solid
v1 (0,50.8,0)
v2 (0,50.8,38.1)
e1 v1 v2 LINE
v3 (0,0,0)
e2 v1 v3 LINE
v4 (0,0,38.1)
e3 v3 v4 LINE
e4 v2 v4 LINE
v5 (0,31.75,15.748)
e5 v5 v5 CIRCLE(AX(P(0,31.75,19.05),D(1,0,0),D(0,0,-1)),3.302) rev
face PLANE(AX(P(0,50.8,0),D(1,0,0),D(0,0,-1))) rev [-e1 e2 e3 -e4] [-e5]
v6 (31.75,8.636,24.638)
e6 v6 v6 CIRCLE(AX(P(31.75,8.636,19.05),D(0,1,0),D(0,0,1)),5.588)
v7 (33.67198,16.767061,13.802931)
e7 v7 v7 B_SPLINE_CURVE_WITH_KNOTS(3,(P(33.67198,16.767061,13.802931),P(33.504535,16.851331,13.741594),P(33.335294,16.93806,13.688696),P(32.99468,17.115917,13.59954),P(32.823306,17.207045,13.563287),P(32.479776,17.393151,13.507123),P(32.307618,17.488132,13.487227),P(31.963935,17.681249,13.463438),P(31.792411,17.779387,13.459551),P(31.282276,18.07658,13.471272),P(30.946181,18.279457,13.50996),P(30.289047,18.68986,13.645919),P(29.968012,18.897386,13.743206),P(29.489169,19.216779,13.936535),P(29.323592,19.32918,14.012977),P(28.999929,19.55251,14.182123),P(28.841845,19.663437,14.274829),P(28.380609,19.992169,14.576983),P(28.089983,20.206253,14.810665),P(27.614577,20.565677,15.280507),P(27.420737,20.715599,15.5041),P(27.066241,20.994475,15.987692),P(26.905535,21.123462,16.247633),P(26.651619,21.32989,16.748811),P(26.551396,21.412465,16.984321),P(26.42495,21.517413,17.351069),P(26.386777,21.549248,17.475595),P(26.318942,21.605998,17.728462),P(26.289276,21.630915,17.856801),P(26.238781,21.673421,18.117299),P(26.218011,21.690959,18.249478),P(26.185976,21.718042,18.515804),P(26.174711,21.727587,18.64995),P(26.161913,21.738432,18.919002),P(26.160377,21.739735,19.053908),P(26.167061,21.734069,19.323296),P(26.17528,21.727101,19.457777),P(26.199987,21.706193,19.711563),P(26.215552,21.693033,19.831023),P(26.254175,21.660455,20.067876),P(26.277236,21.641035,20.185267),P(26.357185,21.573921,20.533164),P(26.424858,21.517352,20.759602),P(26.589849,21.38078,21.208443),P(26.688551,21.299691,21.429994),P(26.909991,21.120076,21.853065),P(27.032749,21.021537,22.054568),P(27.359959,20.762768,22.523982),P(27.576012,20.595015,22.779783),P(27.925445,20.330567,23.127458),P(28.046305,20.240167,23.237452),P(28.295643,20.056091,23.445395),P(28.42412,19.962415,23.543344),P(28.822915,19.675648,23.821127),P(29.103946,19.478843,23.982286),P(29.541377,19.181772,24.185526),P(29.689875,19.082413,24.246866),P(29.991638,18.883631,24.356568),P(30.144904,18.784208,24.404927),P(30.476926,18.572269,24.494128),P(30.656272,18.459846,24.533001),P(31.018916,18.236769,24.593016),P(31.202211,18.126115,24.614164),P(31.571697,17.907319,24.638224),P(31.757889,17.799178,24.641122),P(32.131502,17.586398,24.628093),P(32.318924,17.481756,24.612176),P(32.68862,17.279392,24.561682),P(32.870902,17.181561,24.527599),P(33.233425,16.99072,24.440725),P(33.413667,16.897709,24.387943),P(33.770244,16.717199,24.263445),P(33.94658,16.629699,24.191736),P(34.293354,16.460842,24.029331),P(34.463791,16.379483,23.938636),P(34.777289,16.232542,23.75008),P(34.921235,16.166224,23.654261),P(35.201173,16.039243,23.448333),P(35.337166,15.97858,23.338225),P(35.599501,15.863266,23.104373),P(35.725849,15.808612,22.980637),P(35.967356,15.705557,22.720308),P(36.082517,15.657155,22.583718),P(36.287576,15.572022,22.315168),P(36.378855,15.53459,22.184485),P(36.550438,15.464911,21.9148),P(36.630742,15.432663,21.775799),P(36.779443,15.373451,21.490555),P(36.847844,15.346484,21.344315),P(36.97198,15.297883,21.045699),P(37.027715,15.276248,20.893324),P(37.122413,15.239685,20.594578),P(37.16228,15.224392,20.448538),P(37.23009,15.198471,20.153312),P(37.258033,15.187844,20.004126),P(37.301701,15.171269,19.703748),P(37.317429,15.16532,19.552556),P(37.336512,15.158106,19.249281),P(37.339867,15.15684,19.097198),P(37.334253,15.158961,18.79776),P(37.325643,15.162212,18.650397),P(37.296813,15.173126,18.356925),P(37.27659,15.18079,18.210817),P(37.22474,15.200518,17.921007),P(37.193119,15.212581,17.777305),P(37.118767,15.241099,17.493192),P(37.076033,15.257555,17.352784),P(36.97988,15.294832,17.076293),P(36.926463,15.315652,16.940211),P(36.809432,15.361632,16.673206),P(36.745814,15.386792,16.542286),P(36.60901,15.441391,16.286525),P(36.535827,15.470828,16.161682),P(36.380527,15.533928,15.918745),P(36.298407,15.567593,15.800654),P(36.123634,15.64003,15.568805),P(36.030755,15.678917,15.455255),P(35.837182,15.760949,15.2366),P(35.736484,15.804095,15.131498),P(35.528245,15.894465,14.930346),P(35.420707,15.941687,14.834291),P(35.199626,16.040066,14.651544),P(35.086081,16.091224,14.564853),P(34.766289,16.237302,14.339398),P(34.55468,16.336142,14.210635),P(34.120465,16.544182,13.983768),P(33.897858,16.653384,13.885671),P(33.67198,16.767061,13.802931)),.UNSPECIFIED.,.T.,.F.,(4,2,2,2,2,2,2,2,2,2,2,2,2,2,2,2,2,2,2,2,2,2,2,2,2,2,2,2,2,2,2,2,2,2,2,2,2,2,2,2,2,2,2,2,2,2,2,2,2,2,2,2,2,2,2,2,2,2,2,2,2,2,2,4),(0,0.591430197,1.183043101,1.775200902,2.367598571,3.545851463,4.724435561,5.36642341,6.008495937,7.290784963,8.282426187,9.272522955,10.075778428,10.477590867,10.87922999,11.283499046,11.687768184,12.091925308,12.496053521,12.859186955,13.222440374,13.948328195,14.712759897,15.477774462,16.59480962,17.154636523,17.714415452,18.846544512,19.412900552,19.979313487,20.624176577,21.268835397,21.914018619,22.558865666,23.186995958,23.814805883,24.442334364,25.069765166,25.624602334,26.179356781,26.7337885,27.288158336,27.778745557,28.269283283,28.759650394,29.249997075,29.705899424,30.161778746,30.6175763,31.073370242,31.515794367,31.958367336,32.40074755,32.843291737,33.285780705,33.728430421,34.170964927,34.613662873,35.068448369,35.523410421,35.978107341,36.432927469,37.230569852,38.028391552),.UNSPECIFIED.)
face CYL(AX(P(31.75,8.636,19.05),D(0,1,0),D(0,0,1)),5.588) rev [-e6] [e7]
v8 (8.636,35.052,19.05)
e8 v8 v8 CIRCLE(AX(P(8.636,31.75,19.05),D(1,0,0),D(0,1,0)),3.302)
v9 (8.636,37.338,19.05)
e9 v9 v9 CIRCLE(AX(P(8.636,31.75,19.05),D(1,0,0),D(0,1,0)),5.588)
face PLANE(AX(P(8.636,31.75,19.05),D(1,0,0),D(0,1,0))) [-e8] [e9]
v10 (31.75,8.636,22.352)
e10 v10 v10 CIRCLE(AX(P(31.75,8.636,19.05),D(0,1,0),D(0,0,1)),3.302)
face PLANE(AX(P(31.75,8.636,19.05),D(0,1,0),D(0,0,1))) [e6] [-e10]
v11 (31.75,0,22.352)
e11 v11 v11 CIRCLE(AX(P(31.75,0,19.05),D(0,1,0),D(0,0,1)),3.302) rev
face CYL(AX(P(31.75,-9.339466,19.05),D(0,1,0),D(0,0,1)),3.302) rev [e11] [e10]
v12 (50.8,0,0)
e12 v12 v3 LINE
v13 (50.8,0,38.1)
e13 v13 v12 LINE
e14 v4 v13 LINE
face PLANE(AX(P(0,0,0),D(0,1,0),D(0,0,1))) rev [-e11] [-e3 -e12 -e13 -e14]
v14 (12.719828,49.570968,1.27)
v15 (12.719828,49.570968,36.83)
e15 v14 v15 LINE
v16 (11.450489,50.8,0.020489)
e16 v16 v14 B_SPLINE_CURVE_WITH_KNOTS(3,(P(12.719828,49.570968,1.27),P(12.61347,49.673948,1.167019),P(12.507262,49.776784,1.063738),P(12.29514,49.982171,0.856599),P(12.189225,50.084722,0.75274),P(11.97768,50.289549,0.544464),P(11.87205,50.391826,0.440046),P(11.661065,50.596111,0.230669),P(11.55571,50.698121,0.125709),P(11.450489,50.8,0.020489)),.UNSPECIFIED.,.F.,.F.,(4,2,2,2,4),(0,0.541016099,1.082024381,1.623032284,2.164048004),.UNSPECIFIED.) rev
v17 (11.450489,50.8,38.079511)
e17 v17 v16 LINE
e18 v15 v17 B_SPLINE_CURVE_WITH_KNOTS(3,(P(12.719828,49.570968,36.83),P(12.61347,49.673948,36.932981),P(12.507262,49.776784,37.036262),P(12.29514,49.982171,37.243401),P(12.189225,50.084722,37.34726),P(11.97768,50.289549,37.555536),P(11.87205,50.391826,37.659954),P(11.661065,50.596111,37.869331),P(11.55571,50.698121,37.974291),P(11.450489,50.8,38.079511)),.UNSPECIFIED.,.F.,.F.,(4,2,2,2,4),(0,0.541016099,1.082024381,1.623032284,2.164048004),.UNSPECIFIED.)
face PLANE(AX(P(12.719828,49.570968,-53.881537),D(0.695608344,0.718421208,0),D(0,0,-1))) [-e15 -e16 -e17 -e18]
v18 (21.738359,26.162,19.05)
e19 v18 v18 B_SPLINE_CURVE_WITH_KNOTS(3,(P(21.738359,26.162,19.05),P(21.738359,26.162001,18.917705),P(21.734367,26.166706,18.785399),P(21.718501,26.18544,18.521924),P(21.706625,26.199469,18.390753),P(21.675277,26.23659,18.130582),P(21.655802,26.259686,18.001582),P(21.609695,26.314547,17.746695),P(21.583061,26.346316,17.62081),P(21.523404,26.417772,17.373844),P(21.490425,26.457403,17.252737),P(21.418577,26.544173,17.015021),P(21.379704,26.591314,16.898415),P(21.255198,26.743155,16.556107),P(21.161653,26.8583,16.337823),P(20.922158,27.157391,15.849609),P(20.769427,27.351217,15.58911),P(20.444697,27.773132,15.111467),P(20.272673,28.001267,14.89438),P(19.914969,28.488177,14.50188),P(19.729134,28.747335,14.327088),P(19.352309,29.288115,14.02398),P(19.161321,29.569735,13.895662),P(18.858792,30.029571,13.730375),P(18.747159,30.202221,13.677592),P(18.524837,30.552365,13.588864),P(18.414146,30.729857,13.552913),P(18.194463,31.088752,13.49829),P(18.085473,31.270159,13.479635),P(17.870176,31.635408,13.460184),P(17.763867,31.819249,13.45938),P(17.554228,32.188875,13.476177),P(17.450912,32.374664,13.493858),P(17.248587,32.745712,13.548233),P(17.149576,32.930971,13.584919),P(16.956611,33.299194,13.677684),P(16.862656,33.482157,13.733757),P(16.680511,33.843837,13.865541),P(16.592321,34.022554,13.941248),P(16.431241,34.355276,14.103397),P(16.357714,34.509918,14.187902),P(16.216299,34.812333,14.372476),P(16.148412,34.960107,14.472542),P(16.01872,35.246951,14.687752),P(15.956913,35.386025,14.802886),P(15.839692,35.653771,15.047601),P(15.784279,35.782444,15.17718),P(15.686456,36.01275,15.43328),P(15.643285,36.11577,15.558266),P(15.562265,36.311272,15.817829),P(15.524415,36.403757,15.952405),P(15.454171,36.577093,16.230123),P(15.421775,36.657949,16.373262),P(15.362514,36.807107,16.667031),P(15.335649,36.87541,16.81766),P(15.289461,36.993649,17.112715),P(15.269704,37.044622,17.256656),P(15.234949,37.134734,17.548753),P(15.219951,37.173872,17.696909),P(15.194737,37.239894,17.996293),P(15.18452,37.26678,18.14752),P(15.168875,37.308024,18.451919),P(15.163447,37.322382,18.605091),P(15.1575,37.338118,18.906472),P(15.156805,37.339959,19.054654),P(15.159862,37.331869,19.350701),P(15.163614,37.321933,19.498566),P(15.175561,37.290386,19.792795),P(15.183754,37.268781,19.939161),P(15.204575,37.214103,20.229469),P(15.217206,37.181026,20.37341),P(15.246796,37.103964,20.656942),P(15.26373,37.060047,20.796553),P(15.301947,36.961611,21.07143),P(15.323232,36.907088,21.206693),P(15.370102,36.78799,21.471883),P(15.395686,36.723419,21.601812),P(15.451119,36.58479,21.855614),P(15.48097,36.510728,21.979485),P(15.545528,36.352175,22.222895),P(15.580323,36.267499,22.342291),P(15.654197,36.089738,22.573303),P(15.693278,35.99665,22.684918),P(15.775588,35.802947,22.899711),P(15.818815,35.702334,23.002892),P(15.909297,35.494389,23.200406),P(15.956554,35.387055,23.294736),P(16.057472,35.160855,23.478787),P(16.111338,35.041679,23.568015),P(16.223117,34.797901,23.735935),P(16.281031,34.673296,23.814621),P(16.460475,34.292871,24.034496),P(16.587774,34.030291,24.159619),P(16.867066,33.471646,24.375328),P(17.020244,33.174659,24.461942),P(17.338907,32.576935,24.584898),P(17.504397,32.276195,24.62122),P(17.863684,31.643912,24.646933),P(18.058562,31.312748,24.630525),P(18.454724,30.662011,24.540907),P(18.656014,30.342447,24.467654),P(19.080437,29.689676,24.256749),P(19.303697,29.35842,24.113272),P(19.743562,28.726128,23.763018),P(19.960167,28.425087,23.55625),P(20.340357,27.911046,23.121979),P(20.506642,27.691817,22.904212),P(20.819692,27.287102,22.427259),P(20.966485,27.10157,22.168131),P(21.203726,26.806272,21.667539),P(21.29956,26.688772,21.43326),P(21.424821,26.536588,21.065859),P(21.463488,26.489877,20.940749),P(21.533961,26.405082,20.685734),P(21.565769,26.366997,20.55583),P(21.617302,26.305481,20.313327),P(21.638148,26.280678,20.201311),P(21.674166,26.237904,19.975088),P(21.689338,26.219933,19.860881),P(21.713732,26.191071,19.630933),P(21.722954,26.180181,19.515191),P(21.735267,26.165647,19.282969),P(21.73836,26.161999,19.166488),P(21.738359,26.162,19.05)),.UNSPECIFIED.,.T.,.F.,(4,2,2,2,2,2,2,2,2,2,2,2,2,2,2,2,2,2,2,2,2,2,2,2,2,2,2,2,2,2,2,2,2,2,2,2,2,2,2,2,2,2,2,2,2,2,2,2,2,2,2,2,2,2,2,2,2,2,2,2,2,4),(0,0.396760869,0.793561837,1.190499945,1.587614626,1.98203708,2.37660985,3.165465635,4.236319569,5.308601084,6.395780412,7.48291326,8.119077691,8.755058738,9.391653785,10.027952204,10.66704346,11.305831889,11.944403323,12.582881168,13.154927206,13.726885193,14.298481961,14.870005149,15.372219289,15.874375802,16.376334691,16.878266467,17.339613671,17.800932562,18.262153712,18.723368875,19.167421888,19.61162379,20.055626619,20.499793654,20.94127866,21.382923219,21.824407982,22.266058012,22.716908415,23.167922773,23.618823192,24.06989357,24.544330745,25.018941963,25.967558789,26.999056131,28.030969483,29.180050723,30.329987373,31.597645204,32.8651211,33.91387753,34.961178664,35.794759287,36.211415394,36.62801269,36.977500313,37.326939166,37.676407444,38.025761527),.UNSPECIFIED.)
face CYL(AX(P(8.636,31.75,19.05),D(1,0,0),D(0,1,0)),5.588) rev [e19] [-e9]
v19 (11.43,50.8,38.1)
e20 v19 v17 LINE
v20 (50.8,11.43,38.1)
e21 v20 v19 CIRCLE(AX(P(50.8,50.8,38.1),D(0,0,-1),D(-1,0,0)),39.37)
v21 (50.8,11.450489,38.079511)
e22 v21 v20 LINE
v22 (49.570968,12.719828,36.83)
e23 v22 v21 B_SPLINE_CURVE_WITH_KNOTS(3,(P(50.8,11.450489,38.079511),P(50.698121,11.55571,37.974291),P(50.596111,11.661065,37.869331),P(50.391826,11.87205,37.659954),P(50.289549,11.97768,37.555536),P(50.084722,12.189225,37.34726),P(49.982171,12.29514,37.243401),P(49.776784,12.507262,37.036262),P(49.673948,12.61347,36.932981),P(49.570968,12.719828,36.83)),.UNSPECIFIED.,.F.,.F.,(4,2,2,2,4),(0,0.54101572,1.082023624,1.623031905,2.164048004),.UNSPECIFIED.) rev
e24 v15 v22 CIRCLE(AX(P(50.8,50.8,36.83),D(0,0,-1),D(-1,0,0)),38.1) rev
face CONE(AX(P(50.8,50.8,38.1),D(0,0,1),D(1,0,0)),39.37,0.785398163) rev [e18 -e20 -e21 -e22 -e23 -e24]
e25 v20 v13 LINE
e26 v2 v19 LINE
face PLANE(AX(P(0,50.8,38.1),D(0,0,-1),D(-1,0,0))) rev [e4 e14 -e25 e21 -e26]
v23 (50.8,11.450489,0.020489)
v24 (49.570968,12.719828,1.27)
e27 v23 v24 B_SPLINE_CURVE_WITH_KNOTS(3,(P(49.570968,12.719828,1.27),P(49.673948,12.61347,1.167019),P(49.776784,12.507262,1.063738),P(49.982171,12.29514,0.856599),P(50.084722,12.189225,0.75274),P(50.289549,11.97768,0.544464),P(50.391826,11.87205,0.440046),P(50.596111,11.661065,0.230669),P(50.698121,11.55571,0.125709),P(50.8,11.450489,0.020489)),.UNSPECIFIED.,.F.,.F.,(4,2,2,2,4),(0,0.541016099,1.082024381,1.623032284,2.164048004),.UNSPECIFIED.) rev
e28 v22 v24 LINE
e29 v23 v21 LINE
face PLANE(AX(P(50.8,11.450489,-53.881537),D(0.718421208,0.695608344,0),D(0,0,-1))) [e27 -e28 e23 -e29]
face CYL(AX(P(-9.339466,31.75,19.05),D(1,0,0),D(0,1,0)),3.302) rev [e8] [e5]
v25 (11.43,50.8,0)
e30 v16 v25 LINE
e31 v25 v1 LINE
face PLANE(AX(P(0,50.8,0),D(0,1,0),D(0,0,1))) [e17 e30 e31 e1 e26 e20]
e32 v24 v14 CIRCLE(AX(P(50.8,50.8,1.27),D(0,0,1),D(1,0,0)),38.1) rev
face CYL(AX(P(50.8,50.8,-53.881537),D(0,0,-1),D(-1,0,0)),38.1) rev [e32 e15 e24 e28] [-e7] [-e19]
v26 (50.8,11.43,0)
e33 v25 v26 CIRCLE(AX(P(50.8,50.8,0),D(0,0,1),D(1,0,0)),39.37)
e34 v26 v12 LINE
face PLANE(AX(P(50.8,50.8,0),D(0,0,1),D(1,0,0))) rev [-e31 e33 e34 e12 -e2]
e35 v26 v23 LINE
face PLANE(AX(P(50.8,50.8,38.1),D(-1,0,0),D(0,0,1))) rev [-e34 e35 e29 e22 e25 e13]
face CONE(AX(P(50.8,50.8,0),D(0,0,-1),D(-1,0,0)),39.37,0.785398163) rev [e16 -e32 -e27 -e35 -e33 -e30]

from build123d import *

# Parameters (mm, degrees)
SKETCH1_W           = 50.8
SKETCH1_H           = 38.1
BOSS_EXTRUDE1_DEPTH = 50.8
SKETCH2_W           = 38.1
SKETCH2_H           = 38.1
CUT_EXTRUDE1_DEPTH  = 38.1
SKETCH3_R           = 5.588
CUT_EXTRUDE2_DEPTH  = 4.064
SKETCH4_R           = 3.302
CUT_EXTRUDE3_DEPTH  = 8.636
SKETCH5_R           = 5.588
CUT_EXTRUDE4_DEPTH  = 4.064
SKETCH6_R           = 3.302
CUT_EXTRUDE5_DEPTH  = 8.636
FILLET1_R           = 38.1


with BuildPart() as part:
    # Sketch1 → Boss-Extrude1 (new body)
    with BuildSketch(Plane(origin=(0, 0, 0), x_dir=(1, 0, 0), z_dir=(0, 1, 0))):
        with Locations((25.4, -19.05)):
            Rectangle(SKETCH1_W, SKETCH1_H)
    extrude(amount=BOSS_EXTRUDE1_DEPTH)

    # Sketch2 → Cut-Extrude1 (cut)
    with BuildSketch(Plane.XY.offset(38.1)):
        with Locations((31.75, 31.75)):
            Rectangle(SKETCH2_W, SKETCH2_H)
    extrude(amount=-CUT_EXTRUDE1_DEPTH, mode=Mode.SUBTRACT)

    # Sketch3 → Cut-Extrude2 (cut)
    with BuildSketch(Plane(origin=(0, 12.7, 0), x_dir=(1, 0, 0), z_dir=(0, 1, 0))):
        with Locations(Location((31.75, -19.05, 0), (0, 0, 270))):
            Circle(SKETCH3_R)
    extrude(amount=-CUT_EXTRUDE2_DEPTH, mode=Mode.SUBTRACT)

    # Sketch4 → Cut-Extrude3 (cut)
    with BuildSketch(Plane(origin=(0, 8.636, 0), x_dir=(1, 0, 0), z_dir=(0, 1, 0))):
        with Locations(Location((31.75, -19.05, 0), (0, 0, 270))):
            Circle(SKETCH4_R)
    extrude(amount=-CUT_EXTRUDE3_DEPTH, mode=Mode.SUBTRACT)

    # Sketch5 → Cut-Extrude4 (cut)
    with BuildSketch(Plane(origin=(12.7, 0, 0), x_dir=(0, 0, -1), z_dir=(1, 0, 0))):
        with Locations(Location((-19.05, 31.75, 0), (0, 0, 90))):
            Circle(SKETCH5_R)
    extrude(amount=-CUT_EXTRUDE4_DEPTH, mode=Mode.SUBTRACT)

    # Sketch6 → Cut-Extrude5 (cut)
    with BuildSketch(Plane(origin=(8.636, 0, 0), x_dir=(0, 0, -1), z_dir=(1, 0, 0))):
        with Locations(Location((-19.05, 31.75, 0), (0, 0, 90))):
            Circle(SKETCH6_R)
    extrude(amount=-CUT_EXTRUDE5_DEPTH, mode=Mode.SUBTRACT)

    # Fillet1
    # the kernel refuses this fillet: 38.1 mm, written as the material it adds along each edge
    with BuildSketch(Plane(origin=(12.7, 12.7, 38.1), x_dir=(0, 1, 0), z_dir=(0, 0, -1))) as fillet1_piece_1_section:
        with BuildLine():
            CenterArc((FILLET1_R, FILLET1_R), FILLET1_R, 180, 90)
            Line((0, FILLET1_R), (0, 0))
            Line((0, 0), (FILLET1_R, 0))
        make_face()
    fillet1_piece_1 = extrude(amount=38.1, mode=Mode.PRIVATE)
    fillet1_piece_1 = fillet1_piece_1 - Plane(origin=(21.164766811, 31.75, 19.05), x_dir=(0, 1, 0), z_dir=(1, 0, 0)) * Cylinder(5.588, 229, mode=Mode.PRIVATE)
    fillet1_piece_1 = fillet1_piece_1 - Plane(origin=(31.75, 21.164747652, 19.05), x_dir=(0, 0, 1), z_dir=(0, 1, 0)) * Cylinder(5.588, 229, mode=Mode.PRIVATE)
    add(fillet1_piece_1)

    # Chamfer1
    # the kernel refuses this chamfer: 1.27 mm, written as the material it takes off along each edge
    with BuildSketch(Plane(origin=(50.8, 12.7, 41.316229993), x_dir=(-0.9990092495059921, 0.04450302687991344, 0), z_dir=(0, 0, -1))) as chamfer1_piece_1:
        with BuildLine():
            Line((1.265623079, 0), (-0.09253308, -1.283159884))
            Line((-0.09253308, -1.283159884), (-0.117907915, -1.282029507))
            ThreePointArc((-0.117907915, -1.282029507), (-0.053990428, -0.641235865), (-0.025374835, 0.001130377))
            Line((-0.025374835, 0.001130377), (0.001130377, 0.025374835))
            ThreePointArc((0.001130377, 0.025374835), (0.632880934, 0.002485367), (1.265934324, 0.025398093))
            Line((1.265934324, 0.025398093), (1.265623079, 0))
        make_face()
    extrude(amount=44.532459986, mode=Mode.SUBTRACT)
    with BuildSketch(Plane(origin=(12.7, 50.8, 41.316229993), x_dir=(0.04450302687991419, -0.9990092495059921, 0), z_dir=(0, 0, -1))) as chamfer1_piece_2:
        with BuildLine():
            Line((1.265623079, 0), (-0.09253308, 1.283159884))
            Line((-0.09253308, 1.283159884), (-0.117907915, 1.282029507))
            ThreePointArc((-0.117907915, 1.282029507), (-0.053990428, 0.641235865), (-0.025374835, -0.001130377))
            Line((-0.025374835, -0.001130377), (0.001130377, -0.025374835))
            ThreePointArc((0.001130377, -0.025374835), (0.632880934, -0.002485367), (1.265934324, -0.025398093))
            Line((1.265934324, -0.025398093), (1.265623079, 0))
        make_face()
    extrude(amount=44.532459986, mode=Mode.SUBTRACT)
    with BuildSketch(Plane(origin=(50.8, 50.8, 38.1), x_dir=(0.08565212644692491, -0.9963251041879453, 0), z_dir=(0.9963251041879453, 0.08565212644692491, 0))) as chamfer1_piece_3:
        with BuildLine():
            Line((38.064078976, 1.305921024), (39.405921024, -0.035921024))
            Line((39.405921024, -0.035921024), (39.405921024, -0.061321024))
            ThreePointArc((39.405921024, -0.061321024), (38.752960512, -0.0254), (38.1, -0.0254))
            Line((38.1, -0.0254), (38.0746, 0))
            ThreePointArc((38.0746, 0), (38.0746, 0.652960512), (38.038678976, 1.305921024))
            Line((38.038678976, 1.305921024), (38.064078976, 1.305921024))
        make_face()
    revolve(axis=Axis((50.8, 50.8, 38.1), (0, 0, -1)), revolution_arc=99.827051452, mode=Mode.SUBTRACT)
    with BuildSketch(Plane(origin=(50.8, 50.8, 0), x_dir=(0.08565212644692491, -0.9963251041879453, 0), z_dir=(0.9963251041879453, 0.08565212644692491, 0))) as chamfer1_piece_4:
        with BuildLine():
            Line((38.064078976, -1.305921024), (39.405921024, 0.035921024))
            Line((39.405921024, 0.035921024), (39.405921024, 0.061321024))
            ThreePointArc((39.405921024, 0.061321024), (38.752960512, 0.0254), (38.1, 0.0254))
            Line((38.1, 0.0254), (38.0746, 0))
            ThreePointArc((38.0746, 0), (38.0746, -0.652960512), (38.038678976, -1.305921024))
            Line((38.038678976, -1.305921024), (38.064078976, -1.305921024))
        make_face()
    revolve(axis=Axis((50.8, 50.8, 0), (0, 0, -1)), revolution_arc=99.827051452, mode=Mode.SUBTRACT)


solid = part.part
